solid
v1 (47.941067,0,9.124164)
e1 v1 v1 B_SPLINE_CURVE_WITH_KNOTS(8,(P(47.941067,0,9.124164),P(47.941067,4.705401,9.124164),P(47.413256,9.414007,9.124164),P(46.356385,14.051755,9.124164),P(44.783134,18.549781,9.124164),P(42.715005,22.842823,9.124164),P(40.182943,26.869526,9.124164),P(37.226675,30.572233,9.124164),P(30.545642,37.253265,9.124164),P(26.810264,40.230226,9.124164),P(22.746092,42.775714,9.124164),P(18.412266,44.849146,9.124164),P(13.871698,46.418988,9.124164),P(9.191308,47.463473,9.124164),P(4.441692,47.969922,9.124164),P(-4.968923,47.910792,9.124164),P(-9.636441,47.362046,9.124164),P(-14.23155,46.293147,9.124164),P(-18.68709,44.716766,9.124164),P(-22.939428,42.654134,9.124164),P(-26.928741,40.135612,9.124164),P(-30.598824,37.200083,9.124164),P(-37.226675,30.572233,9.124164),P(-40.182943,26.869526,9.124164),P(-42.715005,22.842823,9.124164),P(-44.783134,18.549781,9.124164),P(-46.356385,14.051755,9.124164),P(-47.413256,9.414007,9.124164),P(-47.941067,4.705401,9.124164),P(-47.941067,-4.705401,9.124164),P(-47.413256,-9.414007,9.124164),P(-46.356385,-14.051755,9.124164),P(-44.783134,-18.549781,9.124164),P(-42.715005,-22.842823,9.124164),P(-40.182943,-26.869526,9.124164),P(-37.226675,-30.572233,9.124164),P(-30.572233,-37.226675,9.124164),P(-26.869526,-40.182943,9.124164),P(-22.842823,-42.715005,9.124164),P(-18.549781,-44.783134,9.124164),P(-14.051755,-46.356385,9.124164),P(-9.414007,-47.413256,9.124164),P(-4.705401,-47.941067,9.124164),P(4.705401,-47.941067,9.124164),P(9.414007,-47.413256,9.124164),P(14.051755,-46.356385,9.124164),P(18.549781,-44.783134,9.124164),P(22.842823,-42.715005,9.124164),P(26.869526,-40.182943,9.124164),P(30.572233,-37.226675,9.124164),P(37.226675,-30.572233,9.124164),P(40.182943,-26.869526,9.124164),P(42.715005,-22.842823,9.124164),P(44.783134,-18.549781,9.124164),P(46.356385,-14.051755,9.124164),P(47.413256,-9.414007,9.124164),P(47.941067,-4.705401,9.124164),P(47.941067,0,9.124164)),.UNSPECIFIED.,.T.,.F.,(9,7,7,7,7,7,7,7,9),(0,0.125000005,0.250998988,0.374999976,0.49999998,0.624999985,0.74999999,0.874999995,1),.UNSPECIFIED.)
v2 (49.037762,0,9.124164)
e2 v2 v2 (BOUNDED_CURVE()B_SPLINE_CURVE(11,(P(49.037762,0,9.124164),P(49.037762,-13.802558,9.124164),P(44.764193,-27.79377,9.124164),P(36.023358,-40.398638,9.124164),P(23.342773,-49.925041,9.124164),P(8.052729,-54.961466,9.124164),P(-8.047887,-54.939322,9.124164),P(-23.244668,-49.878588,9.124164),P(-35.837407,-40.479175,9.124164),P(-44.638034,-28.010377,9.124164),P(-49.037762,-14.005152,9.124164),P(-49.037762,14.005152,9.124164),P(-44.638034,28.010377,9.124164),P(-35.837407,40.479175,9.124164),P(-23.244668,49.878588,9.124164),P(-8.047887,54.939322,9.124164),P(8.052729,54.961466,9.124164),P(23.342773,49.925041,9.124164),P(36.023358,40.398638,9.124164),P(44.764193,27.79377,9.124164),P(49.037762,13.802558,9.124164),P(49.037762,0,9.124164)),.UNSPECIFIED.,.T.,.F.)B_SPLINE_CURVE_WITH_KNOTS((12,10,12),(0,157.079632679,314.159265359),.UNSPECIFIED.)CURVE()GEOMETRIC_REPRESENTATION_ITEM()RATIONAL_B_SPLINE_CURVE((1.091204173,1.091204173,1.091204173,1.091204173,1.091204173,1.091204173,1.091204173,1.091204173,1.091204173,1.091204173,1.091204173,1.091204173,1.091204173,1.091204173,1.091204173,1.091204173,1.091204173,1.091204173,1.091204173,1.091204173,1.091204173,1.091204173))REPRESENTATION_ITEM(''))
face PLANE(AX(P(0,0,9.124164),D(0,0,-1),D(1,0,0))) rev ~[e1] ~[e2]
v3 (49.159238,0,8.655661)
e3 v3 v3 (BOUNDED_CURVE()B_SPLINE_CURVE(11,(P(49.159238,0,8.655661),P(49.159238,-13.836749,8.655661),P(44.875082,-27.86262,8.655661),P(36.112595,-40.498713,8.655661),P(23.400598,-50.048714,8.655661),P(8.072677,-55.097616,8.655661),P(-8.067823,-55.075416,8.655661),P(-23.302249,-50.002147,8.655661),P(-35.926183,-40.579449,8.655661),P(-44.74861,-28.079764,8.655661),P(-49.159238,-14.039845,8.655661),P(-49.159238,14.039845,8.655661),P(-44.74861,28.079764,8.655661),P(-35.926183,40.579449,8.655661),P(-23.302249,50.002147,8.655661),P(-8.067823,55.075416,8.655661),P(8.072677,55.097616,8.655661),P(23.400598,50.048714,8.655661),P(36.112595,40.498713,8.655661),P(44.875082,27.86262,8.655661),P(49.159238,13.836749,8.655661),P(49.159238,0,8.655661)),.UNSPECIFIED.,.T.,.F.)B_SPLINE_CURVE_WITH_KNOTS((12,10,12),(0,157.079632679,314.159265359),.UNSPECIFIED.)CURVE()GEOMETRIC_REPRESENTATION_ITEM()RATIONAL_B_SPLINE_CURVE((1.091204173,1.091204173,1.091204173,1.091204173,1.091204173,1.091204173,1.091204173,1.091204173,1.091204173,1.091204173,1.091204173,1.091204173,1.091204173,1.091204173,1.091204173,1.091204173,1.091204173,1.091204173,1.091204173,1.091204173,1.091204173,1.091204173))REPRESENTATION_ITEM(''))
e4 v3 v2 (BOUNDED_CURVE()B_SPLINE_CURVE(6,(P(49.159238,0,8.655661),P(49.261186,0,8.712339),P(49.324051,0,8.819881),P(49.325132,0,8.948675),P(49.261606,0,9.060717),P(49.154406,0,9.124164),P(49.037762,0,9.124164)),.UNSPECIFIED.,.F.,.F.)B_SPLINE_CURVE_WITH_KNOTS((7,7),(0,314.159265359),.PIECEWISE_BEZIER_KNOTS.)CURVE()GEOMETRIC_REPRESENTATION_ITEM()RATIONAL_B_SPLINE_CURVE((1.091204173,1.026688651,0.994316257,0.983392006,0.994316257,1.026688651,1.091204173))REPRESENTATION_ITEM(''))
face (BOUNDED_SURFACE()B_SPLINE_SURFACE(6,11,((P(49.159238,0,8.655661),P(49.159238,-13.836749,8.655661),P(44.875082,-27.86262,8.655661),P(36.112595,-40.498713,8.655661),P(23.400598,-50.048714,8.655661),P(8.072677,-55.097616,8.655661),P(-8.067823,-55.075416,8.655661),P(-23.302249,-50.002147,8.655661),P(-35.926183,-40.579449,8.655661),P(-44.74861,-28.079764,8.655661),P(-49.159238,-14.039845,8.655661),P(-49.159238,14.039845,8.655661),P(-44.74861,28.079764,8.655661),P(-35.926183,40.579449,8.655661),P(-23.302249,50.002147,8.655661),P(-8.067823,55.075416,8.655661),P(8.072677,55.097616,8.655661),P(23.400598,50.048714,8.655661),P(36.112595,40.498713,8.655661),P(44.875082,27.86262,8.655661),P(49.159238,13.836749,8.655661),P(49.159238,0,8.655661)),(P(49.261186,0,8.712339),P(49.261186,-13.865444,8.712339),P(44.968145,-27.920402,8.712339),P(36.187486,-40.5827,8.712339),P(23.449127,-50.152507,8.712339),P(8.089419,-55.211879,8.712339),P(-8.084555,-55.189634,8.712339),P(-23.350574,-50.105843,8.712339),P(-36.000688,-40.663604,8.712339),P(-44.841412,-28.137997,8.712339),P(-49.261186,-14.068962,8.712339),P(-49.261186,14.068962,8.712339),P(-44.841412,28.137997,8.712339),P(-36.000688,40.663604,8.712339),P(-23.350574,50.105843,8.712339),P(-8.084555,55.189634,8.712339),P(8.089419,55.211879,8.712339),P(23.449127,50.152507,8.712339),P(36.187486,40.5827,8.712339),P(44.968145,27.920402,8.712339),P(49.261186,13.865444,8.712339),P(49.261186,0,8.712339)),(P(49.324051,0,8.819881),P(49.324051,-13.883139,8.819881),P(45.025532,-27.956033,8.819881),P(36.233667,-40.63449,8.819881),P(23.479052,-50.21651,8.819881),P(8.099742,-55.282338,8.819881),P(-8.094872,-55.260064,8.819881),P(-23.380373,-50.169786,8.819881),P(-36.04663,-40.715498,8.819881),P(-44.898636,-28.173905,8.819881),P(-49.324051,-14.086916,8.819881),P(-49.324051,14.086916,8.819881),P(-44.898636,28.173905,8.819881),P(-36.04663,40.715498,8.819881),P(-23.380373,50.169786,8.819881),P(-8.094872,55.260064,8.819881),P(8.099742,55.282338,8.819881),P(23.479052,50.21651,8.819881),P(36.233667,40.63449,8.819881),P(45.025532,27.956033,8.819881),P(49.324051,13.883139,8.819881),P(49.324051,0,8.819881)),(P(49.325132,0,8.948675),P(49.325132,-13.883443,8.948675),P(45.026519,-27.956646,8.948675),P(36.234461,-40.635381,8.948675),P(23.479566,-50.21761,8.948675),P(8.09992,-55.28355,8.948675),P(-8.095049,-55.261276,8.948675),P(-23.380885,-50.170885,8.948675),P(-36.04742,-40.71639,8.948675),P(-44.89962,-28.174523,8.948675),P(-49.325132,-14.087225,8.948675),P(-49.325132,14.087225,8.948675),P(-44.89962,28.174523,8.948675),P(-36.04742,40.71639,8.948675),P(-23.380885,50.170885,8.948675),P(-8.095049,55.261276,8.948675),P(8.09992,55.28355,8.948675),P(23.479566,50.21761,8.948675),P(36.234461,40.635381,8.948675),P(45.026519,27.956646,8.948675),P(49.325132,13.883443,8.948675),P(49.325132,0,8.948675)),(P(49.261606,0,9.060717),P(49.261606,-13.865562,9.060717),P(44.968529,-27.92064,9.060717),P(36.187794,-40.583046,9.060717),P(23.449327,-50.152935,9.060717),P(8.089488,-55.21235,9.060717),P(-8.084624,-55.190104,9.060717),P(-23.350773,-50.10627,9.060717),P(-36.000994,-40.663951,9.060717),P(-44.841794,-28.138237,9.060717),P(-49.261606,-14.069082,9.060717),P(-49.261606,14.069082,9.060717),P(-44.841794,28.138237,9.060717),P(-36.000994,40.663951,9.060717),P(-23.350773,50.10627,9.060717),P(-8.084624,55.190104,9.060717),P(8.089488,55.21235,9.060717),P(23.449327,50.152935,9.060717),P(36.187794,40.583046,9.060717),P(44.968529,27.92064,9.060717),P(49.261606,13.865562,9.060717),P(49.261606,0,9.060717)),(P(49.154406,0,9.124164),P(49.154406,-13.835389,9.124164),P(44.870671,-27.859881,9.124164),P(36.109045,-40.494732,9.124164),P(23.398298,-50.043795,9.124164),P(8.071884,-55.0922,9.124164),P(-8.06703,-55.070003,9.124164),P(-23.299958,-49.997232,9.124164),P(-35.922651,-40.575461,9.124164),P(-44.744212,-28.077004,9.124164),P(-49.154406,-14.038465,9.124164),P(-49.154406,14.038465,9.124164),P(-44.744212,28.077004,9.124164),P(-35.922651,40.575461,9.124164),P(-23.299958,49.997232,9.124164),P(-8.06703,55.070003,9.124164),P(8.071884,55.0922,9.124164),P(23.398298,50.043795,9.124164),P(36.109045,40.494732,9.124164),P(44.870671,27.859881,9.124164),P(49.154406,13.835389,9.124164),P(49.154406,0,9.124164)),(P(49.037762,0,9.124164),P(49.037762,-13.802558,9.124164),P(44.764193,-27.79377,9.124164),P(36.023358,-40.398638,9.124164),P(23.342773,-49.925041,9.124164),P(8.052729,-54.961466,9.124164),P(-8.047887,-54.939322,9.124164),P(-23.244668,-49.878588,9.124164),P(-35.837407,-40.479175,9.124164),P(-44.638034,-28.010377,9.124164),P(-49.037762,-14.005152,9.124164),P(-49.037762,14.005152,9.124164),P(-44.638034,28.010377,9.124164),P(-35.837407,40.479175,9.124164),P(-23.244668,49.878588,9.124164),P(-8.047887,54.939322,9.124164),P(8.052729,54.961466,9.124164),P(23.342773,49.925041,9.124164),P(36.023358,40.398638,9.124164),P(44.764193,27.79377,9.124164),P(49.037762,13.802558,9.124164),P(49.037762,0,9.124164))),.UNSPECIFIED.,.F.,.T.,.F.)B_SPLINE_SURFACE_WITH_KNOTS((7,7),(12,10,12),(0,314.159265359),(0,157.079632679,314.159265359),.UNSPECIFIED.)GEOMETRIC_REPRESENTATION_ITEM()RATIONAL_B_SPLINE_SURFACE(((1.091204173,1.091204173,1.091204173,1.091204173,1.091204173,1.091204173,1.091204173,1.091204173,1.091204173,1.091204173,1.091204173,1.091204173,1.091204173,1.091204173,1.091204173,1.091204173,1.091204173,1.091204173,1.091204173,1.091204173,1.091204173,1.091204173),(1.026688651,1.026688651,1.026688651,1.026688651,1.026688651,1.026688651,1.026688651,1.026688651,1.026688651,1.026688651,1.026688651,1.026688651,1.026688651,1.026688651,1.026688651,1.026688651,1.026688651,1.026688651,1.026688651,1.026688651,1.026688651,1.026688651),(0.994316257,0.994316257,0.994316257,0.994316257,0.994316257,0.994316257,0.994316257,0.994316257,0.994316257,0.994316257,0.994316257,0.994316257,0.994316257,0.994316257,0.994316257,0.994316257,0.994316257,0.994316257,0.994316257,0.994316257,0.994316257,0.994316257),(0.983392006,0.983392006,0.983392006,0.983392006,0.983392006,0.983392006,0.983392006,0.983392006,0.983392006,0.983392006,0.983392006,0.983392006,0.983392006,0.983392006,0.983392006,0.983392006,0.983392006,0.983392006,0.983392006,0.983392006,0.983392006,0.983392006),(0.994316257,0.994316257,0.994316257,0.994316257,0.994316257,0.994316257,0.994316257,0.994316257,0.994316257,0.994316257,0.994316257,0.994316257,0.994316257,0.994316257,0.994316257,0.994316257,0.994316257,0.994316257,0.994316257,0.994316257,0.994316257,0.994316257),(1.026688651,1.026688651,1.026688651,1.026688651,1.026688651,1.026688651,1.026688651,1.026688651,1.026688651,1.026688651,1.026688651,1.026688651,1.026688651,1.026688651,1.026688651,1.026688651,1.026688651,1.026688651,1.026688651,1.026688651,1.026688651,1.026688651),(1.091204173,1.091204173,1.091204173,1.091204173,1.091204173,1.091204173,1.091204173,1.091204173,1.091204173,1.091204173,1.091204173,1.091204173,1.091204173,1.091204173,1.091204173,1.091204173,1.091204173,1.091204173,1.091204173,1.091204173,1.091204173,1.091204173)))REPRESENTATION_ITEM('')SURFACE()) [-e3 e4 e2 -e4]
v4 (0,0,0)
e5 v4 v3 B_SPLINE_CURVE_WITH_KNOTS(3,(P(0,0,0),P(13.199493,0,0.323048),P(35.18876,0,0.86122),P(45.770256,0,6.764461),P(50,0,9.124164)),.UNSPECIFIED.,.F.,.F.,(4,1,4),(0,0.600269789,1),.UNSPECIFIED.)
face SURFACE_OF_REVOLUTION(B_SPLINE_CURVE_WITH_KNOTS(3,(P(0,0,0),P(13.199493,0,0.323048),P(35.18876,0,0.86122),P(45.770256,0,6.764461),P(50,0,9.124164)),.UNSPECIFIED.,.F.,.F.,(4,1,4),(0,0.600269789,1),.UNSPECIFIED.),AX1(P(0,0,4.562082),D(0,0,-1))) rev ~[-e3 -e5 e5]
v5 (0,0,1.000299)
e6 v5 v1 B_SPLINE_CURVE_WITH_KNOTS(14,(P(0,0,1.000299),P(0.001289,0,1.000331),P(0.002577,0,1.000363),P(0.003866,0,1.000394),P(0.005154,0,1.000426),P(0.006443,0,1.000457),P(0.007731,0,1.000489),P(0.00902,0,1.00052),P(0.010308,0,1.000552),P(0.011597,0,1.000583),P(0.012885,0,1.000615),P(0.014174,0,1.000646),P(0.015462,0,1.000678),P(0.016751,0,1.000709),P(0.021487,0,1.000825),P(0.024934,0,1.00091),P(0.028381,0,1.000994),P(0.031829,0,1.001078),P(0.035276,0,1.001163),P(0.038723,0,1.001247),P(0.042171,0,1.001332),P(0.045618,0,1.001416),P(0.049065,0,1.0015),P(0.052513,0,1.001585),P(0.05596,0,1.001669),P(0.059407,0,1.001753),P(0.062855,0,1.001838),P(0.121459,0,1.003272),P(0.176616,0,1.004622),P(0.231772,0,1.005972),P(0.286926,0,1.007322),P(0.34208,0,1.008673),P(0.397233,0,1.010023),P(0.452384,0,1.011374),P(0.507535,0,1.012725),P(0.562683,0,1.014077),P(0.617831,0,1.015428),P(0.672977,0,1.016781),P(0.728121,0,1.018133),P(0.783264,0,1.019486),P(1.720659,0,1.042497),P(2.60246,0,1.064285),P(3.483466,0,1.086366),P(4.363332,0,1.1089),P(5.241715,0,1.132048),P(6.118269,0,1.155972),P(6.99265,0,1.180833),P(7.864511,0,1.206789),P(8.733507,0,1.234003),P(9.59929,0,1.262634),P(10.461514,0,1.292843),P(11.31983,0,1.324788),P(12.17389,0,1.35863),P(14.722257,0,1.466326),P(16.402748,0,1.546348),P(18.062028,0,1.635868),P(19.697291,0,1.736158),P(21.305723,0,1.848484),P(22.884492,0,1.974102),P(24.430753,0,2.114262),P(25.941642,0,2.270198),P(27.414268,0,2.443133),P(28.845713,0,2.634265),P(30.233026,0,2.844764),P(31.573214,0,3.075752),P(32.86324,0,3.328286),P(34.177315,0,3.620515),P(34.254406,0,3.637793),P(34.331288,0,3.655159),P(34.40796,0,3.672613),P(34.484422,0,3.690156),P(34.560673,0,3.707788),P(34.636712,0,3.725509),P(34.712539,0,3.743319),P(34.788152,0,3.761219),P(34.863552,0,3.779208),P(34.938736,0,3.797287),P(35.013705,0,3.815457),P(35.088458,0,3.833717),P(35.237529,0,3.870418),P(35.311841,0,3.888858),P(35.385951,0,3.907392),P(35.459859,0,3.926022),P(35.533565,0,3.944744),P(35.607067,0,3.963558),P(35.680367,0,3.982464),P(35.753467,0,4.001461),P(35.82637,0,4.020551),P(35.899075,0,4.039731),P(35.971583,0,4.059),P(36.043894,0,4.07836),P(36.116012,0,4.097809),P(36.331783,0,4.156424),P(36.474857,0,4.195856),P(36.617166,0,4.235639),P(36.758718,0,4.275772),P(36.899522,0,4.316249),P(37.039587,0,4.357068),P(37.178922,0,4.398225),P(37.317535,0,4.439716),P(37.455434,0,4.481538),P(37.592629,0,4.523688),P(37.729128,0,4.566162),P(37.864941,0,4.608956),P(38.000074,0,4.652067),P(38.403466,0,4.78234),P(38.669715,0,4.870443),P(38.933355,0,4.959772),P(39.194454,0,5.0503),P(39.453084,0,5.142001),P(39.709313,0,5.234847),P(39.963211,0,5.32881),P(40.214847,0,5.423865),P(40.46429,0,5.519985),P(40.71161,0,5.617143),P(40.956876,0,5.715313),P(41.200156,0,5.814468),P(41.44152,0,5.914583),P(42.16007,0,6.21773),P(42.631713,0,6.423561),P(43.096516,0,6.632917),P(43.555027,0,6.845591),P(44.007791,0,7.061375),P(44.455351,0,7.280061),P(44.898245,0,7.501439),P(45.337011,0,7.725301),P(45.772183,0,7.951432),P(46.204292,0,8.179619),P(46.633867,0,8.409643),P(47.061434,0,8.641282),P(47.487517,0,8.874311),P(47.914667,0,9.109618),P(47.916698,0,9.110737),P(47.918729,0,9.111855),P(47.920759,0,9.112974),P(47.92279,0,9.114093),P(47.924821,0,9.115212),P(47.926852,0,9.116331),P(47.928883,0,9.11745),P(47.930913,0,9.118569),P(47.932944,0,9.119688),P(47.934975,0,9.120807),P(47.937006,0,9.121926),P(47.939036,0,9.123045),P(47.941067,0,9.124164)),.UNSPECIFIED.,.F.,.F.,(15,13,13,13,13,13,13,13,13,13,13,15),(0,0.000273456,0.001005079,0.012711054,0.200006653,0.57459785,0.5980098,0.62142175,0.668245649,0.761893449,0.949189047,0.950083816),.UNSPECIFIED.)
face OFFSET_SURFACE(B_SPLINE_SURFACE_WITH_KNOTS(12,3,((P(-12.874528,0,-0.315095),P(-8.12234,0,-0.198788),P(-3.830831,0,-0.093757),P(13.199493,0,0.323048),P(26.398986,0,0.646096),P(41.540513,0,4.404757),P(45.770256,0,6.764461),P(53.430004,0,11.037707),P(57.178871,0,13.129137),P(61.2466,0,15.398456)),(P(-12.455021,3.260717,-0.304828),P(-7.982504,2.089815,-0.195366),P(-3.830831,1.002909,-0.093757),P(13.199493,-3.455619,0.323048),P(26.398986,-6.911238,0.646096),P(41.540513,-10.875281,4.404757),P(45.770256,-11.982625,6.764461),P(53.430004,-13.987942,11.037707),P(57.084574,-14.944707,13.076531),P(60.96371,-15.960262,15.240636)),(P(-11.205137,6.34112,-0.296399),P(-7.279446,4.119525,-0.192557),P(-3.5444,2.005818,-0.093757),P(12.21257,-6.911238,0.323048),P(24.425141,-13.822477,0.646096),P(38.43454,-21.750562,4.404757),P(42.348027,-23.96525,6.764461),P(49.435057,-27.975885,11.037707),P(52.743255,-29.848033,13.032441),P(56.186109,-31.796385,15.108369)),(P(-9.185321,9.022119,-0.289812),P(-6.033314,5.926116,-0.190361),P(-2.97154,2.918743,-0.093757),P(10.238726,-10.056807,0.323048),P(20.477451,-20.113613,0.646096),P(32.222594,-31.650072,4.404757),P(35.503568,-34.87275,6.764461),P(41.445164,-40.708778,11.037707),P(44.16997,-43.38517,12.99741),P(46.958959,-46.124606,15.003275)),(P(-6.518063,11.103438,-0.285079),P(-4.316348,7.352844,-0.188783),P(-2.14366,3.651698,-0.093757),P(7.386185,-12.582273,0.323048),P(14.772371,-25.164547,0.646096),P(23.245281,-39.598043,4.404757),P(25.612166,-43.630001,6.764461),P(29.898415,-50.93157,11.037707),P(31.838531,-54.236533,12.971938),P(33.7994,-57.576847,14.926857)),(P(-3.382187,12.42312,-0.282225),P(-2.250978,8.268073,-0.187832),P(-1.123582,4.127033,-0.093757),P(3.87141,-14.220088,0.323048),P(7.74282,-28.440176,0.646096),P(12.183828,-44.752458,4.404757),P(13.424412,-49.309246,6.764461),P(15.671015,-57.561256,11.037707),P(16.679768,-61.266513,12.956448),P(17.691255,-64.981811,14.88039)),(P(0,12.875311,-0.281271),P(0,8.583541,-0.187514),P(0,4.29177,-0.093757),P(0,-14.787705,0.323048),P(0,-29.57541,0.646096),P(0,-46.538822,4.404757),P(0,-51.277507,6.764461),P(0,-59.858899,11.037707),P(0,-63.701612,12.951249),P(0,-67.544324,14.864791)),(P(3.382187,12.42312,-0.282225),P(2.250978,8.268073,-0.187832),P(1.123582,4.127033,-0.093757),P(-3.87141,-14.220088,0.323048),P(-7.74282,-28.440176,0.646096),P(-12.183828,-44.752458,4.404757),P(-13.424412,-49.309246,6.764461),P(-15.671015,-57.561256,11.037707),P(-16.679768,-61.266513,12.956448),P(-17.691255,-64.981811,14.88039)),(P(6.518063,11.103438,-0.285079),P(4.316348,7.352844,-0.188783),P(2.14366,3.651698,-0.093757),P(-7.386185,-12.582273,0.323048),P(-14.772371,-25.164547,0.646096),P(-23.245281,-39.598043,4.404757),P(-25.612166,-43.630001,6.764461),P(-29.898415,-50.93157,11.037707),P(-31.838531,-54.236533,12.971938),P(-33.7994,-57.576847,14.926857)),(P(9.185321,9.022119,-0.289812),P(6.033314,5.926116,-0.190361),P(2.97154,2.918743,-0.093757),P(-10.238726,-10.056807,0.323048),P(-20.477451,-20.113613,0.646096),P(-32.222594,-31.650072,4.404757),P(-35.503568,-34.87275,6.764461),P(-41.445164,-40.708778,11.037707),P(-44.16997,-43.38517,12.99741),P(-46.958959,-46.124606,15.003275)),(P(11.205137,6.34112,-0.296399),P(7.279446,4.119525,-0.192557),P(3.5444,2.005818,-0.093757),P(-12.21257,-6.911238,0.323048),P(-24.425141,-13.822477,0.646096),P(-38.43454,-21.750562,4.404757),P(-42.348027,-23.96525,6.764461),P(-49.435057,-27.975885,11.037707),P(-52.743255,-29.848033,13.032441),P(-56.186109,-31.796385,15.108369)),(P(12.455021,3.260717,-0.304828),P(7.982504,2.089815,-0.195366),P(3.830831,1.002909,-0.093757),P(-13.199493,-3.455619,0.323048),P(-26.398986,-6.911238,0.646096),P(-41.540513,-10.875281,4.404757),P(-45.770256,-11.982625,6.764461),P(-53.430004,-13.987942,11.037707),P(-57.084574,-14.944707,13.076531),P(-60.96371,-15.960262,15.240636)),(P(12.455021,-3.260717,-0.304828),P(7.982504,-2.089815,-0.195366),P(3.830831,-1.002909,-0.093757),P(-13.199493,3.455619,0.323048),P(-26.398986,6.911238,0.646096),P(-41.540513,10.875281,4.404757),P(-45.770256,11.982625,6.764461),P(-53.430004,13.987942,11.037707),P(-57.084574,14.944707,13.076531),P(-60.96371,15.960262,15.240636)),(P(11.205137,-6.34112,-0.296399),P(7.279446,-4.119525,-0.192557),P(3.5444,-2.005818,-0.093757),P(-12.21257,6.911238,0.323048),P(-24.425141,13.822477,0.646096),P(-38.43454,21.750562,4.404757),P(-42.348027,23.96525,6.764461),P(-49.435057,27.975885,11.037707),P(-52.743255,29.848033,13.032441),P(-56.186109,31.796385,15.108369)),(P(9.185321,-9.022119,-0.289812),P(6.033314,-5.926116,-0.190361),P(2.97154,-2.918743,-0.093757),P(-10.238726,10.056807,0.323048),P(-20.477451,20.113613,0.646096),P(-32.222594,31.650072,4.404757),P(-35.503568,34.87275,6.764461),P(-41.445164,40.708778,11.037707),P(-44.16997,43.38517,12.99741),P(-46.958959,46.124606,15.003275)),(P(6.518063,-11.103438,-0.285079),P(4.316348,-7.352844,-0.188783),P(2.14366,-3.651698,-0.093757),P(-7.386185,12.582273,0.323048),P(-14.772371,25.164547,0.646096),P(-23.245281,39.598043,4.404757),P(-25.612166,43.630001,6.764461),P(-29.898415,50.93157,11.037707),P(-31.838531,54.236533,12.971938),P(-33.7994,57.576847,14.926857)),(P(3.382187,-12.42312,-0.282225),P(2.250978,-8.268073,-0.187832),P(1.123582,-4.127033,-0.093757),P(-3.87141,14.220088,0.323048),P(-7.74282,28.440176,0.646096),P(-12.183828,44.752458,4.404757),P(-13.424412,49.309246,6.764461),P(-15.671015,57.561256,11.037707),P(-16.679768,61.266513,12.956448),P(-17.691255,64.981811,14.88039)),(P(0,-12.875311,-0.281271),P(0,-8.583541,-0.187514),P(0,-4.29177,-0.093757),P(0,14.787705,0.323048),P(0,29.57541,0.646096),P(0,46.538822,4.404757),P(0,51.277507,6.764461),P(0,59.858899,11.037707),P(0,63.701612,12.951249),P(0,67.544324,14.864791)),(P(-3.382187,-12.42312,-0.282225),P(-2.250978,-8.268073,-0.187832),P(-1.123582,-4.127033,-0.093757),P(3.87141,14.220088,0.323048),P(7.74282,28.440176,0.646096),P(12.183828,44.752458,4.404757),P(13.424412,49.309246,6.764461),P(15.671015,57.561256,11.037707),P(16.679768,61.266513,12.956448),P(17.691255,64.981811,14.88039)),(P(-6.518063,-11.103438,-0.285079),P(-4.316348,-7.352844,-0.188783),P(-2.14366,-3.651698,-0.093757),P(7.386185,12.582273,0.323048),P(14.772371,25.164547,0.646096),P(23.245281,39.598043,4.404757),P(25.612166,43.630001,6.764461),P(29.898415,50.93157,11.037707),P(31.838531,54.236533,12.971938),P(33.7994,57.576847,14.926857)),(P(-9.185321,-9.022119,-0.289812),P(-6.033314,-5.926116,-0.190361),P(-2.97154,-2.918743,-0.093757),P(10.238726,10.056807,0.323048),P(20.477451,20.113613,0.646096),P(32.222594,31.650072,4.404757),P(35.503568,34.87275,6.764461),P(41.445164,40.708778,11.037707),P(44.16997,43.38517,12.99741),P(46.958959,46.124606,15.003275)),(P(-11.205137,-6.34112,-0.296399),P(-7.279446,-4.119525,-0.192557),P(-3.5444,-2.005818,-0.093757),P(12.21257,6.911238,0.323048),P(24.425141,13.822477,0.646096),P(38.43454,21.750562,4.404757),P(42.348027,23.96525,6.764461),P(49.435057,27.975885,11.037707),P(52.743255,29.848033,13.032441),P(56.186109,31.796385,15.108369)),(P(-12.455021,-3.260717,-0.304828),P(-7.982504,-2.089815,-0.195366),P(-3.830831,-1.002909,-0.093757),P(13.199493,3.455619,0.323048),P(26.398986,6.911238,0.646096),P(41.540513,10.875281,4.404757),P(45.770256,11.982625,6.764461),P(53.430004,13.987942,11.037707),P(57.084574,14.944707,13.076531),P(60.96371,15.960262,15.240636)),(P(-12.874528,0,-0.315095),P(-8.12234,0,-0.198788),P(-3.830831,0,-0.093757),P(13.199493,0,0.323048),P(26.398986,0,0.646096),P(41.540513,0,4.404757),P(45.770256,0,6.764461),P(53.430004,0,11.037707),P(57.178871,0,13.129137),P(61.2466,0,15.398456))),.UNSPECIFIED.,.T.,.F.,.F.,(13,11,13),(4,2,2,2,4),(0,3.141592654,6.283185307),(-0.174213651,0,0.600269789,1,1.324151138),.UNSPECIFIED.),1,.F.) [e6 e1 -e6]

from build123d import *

# Parameters (mm, degrees)
F2_T = -1
F3_R = 0.25


with BuildPart() as f1:
    # F0 (on Front) → F1 (revolve)
    with BuildSketch(Plane.XZ):
        with BuildLine():
            Line((50, 9.1241644695), (0, 9.1241644695))
            Line((0, 9.1241644695), (0, 0))
            add(Edge.make_bspline(
                [(0, 0), (13.1994929815, 0.3230482128), (35.188760499, 0.8612199124), (45.7702564106, 6.7644607616), (50, 9.1241644695)],
                knots=[0, 0, 0, 0, 0.6002697894, 1, 1, 1, 1], degree=3))
        make_face()
    revolve(axis=Axis((0, 0, 4.5620822348), (0, 0, -1)))

    # F2
    f2_openings = [f1.faces().sort_by_distance(p)[0] for p in [
        (0, 0, 9.124164),
    ]]
    offset(amount=F2_T, openings=f2_openings)

    # F3
    f3_edges = [f1.edges().sort_by_distance(p)[0] for p in [
        (-50, 0, 9.124164),
    ]]
    fillet(f3_edges, radius=F3_R)


solid = f1.part
